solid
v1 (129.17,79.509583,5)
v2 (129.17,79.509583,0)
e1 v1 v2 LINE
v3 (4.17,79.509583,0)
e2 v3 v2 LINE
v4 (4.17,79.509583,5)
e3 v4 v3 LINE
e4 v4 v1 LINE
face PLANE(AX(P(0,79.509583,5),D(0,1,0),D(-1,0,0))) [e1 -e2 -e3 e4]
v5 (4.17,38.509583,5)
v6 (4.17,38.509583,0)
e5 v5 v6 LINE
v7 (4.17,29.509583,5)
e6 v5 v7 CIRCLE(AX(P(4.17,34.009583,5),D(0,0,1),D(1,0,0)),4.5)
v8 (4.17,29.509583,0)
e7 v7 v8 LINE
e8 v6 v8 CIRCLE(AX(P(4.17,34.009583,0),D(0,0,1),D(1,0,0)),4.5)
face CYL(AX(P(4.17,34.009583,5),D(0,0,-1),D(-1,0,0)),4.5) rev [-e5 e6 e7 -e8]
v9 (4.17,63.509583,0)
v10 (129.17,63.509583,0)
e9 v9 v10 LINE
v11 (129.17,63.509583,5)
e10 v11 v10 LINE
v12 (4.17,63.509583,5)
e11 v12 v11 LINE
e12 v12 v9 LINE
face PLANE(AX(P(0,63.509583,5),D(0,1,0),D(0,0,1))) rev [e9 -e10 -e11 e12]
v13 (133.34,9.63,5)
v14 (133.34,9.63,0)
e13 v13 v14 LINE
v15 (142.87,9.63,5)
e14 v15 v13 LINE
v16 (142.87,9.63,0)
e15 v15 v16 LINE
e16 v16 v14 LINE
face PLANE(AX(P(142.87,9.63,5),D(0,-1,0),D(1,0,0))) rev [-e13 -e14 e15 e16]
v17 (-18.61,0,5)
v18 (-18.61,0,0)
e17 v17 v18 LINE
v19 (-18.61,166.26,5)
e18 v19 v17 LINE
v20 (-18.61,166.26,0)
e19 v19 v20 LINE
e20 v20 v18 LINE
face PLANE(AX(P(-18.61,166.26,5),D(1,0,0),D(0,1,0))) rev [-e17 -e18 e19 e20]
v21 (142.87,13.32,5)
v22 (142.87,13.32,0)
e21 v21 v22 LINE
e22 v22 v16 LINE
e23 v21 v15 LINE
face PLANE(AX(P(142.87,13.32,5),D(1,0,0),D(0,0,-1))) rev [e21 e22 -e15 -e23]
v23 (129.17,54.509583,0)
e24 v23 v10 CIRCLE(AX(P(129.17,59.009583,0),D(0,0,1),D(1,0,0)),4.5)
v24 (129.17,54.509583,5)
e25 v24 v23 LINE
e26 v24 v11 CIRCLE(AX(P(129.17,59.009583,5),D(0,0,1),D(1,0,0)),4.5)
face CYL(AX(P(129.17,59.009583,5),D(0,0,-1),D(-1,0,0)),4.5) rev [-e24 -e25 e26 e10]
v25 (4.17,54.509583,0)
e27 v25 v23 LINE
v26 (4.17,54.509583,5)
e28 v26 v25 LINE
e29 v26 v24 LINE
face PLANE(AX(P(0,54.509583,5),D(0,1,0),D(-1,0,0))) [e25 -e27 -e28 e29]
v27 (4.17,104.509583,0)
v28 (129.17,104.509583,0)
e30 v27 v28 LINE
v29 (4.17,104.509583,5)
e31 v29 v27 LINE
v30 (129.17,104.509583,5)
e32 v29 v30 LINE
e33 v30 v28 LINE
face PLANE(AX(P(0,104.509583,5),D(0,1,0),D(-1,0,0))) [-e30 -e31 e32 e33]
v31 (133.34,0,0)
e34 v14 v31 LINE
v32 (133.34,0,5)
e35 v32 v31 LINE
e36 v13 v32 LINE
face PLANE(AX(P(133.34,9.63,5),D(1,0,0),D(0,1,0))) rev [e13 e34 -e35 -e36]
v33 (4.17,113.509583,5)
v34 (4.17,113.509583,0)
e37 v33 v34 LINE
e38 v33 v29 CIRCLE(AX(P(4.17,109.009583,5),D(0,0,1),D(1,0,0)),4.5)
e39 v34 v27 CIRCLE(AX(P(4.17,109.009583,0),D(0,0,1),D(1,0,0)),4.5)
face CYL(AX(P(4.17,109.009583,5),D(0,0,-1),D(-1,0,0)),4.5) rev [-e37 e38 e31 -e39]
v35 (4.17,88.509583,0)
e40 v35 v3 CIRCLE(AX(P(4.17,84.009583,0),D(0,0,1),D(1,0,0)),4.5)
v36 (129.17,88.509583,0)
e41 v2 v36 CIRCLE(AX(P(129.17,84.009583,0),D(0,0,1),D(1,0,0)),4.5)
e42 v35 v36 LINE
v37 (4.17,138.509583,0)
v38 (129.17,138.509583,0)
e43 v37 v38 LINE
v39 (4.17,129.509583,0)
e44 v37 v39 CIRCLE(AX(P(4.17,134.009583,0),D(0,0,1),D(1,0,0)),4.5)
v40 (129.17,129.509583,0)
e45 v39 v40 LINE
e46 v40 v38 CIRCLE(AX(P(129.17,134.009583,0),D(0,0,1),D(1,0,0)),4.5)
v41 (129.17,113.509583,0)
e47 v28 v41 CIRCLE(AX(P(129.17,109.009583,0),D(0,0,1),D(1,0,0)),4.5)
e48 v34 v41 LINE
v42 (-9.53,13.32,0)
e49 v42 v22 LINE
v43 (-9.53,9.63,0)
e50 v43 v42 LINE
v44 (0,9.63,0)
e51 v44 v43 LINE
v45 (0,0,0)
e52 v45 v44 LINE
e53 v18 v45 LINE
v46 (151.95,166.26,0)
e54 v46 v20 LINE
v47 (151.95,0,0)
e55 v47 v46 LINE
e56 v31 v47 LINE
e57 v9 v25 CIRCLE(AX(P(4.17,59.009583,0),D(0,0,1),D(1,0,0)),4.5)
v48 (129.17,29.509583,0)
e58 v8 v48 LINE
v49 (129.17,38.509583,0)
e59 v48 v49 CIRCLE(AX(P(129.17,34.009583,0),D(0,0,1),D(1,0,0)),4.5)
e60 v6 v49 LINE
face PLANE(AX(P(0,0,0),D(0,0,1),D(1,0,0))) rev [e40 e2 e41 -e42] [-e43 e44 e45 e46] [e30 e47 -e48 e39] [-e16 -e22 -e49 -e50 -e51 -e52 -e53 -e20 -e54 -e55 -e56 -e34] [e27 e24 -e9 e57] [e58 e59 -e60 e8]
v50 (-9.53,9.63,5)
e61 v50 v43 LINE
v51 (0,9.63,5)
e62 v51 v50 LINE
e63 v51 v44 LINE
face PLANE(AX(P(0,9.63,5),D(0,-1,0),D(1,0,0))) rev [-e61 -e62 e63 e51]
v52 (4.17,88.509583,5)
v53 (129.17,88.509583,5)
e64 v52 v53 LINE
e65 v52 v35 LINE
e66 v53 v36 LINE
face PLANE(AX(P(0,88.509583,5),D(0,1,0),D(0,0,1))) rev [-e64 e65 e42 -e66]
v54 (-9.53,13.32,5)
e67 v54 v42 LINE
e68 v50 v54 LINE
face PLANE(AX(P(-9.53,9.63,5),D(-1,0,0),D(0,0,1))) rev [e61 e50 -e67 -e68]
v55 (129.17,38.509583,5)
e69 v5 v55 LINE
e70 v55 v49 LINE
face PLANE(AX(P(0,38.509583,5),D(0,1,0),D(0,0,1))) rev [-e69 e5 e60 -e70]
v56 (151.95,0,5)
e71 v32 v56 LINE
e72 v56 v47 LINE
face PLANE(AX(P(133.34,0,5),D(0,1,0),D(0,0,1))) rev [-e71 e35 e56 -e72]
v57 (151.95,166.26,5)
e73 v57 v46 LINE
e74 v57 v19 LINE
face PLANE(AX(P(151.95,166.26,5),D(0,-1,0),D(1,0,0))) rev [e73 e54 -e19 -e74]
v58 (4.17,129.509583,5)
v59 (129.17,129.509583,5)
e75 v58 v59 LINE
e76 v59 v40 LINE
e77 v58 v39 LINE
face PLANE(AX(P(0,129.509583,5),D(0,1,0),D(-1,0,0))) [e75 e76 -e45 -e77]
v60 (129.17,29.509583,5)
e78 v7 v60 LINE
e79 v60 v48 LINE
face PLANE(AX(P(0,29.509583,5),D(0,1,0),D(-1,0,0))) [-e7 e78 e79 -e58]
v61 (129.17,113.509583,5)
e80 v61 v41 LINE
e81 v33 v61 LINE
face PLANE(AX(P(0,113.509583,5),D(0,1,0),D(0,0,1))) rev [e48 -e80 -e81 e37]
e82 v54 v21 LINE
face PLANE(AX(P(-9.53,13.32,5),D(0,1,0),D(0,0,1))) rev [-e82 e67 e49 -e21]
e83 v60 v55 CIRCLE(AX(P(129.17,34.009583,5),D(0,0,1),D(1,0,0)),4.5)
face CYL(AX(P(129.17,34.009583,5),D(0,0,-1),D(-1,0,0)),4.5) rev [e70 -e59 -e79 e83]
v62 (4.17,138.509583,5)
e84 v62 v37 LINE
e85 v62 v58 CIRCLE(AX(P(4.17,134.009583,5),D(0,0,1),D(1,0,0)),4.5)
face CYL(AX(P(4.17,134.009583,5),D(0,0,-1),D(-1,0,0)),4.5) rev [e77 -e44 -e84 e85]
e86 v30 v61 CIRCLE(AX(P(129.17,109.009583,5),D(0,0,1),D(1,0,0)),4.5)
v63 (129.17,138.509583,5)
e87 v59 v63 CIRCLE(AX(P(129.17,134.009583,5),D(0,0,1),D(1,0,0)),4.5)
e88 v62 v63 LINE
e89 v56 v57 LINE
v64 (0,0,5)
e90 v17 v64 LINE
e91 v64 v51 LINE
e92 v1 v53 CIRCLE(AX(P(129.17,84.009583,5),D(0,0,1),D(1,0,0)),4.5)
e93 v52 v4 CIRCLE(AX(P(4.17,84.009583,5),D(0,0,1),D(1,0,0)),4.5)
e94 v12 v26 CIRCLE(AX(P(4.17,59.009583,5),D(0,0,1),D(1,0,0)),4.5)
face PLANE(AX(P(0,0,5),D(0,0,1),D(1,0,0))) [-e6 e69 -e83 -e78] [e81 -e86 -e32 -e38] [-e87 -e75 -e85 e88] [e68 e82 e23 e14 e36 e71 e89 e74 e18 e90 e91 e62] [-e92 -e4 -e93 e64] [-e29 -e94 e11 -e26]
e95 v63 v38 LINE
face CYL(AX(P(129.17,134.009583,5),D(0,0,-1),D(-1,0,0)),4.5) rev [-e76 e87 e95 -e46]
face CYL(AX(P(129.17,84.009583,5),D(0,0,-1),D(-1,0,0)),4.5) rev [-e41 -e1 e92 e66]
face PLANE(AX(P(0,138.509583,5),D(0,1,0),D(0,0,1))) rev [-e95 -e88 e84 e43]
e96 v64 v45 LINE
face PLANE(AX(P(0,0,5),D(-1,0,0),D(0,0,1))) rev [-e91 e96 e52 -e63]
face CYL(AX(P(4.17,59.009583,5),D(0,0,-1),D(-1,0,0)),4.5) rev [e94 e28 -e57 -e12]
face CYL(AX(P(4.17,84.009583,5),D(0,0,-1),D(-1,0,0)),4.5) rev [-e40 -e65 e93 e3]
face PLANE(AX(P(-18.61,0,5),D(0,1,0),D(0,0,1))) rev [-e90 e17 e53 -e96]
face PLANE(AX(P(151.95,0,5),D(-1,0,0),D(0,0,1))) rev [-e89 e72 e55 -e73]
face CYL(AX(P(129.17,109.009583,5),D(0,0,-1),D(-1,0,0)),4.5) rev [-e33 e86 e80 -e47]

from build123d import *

# Parameters (mm, degrees)
BOSS_EXTRUDE1_DEPTH = 5
LPATTERN1_DEPTH     = 5


# Read off the part's stored shape, not the designer's step: LPattern1
with BuildPart() as part:
    # Sketch1 → Boss-Extrude1 (new body)
    with BuildSketch(Plane.XY):
        Polygon((0, 0), (0, 9.63), (-9.53, 9.63), (-9.53, 13.32), (142.87, 13.32), (142.87, 9.63), (133.34, 9.63), (133.34, 0), (151.95, 0), (151.95, 166.26), (-18.61, 166.26), (-18.61, 0), align=None)
        with BuildLine():
            Line((4.17, 38.509583336), (129.17, 38.509583336))
            ThreePointArc((129.17, 38.509583336), (133.67, 34.009583336), (129.17, 29.509583336))
            Line((129.17, 29.509583336), (4.17, 29.509583336))
            ThreePointArc((4.17, 29.509583336), (-0.33, 34.009583336), (4.17, 38.509583336))
        make_face(mode=Mode.SUBTRACT)
    extrude(amount=BOSS_EXTRUDE1_DEPTH)

    # LPattern1 outline → LPattern1 (cut)
    with BuildSketch(Plane.XY):
        with BuildLine():
            Line((4.17, 129.509583336), (129.17, 129.509583336))
            ThreePointArc((129.17, 129.509583336), (133.67, 134.009583336), (129.17, 138.509583336))
            Line((129.17, 138.509583336), (4.17, 138.509583336))
            ThreePointArc((4.17, 138.509583336), (-0.33, 134.009583336), (4.17, 129.509583336))
        make_face()
        with BuildLine():
            Line((4.17, 104.509583336), (129.17, 104.509583336))
            ThreePointArc((129.17, 104.509583336), (133.67, 109.009583336), (129.17, 113.509583336))
            Line((129.17, 113.509583336), (4.17, 113.509583336))
            ThreePointArc((4.17, 113.509583336), (-0.33, 109.009583336), (4.17, 104.509583336))
        make_face()
        with BuildLine():
            Line((4.17, 79.509583336), (129.17, 79.509583336))
            ThreePointArc((129.17, 79.509583336), (133.67, 84.009583336), (129.17, 88.509583336))
            Line((129.17, 88.509583336), (4.17, 88.509583336))
            ThreePointArc((4.17, 88.509583336), (-0.33, 84.009583336), (4.17, 79.509583336))
        make_face()
        with BuildLine():
            Line((4.17, 54.509583336), (129.17, 54.509583336))
            ThreePointArc((129.17, 54.509583336), (133.67, 59.009583336), (129.17, 63.509583336))
            Line((129.17, 63.509583336), (4.17, 63.509583336))
            ThreePointArc((4.17, 63.509583336), (-0.33, 59.009583336), (4.17, 54.509583336))
        make_face()
    extrude(amount=LPATTERN1_DEPTH, mode=Mode.SUBTRACT)


solid = part.part
